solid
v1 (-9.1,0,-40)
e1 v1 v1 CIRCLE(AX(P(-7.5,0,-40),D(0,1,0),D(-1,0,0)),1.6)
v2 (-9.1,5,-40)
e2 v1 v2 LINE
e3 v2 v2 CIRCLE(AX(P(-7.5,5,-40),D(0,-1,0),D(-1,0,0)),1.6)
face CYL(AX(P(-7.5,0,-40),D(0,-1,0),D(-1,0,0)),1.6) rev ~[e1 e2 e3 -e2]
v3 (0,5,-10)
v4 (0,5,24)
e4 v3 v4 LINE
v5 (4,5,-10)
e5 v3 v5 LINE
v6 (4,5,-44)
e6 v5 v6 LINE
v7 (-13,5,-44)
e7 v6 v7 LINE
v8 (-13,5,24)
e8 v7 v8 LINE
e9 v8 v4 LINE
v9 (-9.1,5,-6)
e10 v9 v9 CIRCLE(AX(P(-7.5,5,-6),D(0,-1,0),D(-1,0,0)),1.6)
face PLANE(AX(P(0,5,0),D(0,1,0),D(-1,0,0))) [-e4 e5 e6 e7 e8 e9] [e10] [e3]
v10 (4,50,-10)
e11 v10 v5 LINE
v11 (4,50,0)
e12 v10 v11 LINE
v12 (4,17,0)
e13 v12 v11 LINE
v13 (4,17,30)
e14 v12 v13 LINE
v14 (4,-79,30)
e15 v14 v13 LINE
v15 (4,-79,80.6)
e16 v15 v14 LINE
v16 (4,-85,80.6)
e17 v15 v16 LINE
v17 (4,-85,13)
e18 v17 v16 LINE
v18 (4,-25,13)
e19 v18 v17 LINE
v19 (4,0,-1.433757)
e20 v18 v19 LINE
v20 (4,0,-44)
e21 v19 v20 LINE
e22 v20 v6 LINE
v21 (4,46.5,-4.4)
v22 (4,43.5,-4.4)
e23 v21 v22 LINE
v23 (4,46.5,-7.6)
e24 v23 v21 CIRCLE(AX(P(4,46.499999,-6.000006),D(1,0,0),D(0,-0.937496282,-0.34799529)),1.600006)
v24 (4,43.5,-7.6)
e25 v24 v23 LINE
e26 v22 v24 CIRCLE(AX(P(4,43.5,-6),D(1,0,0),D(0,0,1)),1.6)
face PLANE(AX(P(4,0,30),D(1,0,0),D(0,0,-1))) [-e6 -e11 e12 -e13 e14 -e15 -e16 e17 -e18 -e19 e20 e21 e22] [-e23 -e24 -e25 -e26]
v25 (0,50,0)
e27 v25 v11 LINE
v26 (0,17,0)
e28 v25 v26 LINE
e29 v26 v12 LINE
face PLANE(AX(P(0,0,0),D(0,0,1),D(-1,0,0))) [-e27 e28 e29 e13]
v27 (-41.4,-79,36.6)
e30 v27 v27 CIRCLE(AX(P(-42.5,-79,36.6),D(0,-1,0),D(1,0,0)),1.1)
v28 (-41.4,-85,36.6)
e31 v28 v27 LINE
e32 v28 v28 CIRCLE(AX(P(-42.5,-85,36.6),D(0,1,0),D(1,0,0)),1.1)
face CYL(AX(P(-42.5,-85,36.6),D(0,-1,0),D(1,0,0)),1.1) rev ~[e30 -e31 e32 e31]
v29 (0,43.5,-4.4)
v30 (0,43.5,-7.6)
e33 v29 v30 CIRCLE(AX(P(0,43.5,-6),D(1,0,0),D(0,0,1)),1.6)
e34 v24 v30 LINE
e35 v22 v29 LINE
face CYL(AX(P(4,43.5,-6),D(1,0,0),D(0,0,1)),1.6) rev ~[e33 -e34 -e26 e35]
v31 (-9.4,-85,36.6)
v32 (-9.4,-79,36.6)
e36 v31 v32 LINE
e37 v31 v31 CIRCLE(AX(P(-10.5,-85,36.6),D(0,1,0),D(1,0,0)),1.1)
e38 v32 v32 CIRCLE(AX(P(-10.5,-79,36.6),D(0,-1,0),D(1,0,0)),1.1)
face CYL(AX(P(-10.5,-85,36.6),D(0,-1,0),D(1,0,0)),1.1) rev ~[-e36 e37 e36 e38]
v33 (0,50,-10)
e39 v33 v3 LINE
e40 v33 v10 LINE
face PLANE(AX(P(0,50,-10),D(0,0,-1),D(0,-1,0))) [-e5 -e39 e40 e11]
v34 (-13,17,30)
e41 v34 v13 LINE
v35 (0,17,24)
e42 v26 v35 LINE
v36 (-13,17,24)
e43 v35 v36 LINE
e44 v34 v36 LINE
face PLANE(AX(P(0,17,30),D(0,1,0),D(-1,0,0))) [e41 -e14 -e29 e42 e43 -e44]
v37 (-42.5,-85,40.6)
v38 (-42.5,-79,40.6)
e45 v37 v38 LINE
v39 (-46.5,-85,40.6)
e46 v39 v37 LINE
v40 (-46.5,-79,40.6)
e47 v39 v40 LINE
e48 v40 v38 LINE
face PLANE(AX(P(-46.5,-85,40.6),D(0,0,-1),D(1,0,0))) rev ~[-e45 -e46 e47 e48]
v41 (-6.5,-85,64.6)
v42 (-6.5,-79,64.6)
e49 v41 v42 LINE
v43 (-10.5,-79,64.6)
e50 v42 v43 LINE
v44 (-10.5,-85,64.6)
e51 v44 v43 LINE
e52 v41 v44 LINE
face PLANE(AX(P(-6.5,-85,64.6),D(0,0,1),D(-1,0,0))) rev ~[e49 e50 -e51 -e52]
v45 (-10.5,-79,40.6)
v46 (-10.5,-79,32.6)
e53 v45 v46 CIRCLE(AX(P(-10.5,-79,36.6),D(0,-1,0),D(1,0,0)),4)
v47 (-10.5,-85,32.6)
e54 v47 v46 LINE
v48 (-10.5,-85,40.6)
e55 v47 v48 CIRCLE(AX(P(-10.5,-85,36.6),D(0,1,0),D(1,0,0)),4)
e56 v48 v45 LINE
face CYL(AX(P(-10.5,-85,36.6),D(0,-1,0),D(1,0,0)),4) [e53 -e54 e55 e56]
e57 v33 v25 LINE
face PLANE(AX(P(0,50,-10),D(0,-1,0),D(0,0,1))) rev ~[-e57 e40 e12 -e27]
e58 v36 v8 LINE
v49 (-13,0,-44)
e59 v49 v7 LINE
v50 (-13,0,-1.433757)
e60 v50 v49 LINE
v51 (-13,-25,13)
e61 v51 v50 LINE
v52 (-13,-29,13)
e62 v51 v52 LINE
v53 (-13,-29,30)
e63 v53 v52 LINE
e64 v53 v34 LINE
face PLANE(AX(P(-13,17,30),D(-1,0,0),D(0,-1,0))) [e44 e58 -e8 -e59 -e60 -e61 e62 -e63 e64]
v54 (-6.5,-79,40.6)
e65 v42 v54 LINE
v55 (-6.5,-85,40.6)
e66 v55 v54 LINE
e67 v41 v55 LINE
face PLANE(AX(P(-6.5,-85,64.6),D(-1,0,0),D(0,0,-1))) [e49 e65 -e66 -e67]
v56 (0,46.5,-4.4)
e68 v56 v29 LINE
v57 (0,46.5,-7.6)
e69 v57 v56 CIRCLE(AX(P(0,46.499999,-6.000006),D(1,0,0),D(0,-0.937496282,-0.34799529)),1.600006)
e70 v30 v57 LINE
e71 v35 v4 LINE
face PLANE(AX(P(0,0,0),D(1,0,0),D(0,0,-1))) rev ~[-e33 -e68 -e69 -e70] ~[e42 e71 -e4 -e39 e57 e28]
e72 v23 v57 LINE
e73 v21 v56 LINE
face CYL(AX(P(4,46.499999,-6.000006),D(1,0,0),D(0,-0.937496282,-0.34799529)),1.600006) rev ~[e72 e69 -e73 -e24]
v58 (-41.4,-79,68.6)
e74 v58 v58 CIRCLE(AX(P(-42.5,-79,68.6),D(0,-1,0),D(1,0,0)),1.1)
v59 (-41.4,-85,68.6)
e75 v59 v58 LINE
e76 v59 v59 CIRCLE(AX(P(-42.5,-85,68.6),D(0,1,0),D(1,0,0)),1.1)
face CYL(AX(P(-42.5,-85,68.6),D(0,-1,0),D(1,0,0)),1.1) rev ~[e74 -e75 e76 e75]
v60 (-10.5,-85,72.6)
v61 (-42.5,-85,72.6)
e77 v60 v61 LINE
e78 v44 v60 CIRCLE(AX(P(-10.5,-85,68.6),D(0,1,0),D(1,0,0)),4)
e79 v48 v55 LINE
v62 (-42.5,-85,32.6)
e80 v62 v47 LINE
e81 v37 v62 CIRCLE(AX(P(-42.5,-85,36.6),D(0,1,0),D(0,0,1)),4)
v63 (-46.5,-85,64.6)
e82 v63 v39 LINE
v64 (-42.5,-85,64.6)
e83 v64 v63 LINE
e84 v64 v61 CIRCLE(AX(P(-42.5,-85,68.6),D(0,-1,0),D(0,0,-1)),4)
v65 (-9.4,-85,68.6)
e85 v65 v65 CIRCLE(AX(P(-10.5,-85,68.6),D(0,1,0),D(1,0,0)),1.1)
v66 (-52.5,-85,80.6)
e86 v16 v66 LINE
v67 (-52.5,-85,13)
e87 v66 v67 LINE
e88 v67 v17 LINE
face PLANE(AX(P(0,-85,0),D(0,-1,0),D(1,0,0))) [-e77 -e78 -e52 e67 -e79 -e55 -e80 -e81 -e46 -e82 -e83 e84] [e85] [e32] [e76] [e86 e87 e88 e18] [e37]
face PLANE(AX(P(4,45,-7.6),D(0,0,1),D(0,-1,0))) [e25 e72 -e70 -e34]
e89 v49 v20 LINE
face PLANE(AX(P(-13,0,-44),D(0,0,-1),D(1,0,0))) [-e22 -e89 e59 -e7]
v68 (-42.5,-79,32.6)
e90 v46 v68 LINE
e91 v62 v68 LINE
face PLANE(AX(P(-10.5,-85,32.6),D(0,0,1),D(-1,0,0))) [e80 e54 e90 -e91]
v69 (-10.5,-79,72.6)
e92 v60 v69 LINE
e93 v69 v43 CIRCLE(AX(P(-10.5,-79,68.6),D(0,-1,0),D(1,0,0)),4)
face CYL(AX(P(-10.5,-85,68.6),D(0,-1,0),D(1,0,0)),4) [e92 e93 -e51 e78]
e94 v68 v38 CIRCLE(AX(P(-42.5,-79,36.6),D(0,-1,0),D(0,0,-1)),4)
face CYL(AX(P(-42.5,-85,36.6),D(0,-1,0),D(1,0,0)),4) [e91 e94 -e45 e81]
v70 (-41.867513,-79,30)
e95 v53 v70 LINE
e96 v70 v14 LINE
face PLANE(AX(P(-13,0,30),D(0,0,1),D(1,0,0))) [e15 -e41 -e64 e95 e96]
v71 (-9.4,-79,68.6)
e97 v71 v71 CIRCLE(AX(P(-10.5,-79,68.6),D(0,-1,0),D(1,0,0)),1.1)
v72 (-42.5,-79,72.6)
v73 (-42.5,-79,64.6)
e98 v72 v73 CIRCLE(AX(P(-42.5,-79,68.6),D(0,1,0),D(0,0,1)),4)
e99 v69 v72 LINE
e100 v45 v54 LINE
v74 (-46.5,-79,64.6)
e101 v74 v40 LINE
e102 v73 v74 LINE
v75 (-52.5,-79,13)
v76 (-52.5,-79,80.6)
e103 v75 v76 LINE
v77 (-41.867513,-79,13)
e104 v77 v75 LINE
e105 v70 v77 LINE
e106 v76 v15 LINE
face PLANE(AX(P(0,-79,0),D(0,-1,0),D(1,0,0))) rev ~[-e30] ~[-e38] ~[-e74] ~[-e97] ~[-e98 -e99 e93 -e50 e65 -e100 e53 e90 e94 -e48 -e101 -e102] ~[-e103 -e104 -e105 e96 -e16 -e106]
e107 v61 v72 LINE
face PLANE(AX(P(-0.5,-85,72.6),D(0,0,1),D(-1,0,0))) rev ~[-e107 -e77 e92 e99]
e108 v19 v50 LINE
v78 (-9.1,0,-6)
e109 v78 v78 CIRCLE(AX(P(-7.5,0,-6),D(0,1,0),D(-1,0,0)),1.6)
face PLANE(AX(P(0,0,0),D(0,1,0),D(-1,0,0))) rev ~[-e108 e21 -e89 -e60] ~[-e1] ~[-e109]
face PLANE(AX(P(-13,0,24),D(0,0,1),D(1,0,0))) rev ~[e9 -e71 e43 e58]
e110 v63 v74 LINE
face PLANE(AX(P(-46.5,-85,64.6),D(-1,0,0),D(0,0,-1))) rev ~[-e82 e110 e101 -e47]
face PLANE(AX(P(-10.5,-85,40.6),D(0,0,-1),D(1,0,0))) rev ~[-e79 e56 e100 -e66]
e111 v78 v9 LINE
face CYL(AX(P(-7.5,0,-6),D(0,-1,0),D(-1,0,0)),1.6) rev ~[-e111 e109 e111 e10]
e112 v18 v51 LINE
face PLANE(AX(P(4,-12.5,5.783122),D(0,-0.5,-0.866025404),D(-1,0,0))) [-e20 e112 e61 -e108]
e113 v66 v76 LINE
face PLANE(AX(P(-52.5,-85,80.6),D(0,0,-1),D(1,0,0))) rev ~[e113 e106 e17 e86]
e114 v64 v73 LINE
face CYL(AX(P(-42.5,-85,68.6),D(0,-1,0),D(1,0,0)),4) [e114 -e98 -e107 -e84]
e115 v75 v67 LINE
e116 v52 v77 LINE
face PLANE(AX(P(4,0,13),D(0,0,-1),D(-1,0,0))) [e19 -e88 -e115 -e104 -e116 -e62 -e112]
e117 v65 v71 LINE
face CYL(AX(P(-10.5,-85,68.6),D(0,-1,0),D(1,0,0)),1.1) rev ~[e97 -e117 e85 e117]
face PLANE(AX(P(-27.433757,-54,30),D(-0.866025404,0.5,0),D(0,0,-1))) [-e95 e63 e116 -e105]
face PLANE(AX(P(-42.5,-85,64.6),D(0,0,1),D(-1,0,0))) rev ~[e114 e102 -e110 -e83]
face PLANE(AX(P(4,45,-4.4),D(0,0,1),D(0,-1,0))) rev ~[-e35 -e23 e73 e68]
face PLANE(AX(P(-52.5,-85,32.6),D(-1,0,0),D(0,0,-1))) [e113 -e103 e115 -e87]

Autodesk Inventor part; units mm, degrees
ref_plane "YZ Plane" through (0, 0, 0) normal (1, 0, 0) x (0, 1, 0)
ref_plane "XZ Plane" through (0, 0, 0) normal (0, 1, 0) x (-1, 0, 0)
ref_plane "XY Plane" through (0, 0, 0) normal (0, 0, 1) x (1, 0, 0)
sketch "Sketch1" plane through (0, 0, 0) normal (0, 1, 0) x (-1, 0, 0)
  line L0 (0, 0) -> (13, 0)
  line L1 (13, 0) -> (13, -44)
  line L2 (13, -44) -> (0, -44)
  line L3 (0, -44) -> (0, 0)
  line L4 (13, 0) -> (13, -6)
  line L5 (13, -6) -> (7.5, -6)
  line L6 (7.5, -6) -> (7.5, -40)
  circle A0 centre (7.5, -6) radius 1.6
  circle A1 centre (7.5, -40) radius 1.6
  dimension "d0" = 13
  dimension "d1" = 44
  dimension "d2" = 6
  dimension "d3" = 5.5
  dimension "d4" = 34
  dimension "d5" = 3.2
  dimension "d6" = 3.2
extrude "Extrusion1" add sketch "Sketch1" along normal blind 5
sketch "Sketch2" plane through (0, 0, 0) normal (1, 0, 0) x (0, 0, -1)
  line L0 (0, 5) -> (44, 5) projected
  line L1 (0, 5) -> (44, 5)
  line L2 (44, 5) -> (44, 50)
  line L3 (44, 50) -> (0, 50)
  line L4 (0, 50) -> (0, 5)
  line L5 (0, 0) -> (44, 0)
  line L6 (44, 0) -> (44, 5)
  line L7 (44, 5) -> (0, 5)
  line L8 (0, 5) -> (0, 0)
  line L9 (0, 50) -> (10, 50)
  line L10 (10, 50) -> (10, 5)
  line L11 (10, 5) -> (0, 5)
  line L12 (0, 5) -> (0, 50)
  dimension "d9" = 44
  dimension "d10" = 45
  dimension "d11" = 10
extrude "Extrusion2" add sketch "Sketch2" along normal blind 4 contours L4 L3 L10 L0 | L0 L6 L5 L8
sketch "Sketch3" plane through (4, 0, 0) normal (1, 0, 0) x (0, 0, -1)
  line L0 (44, 5) -> (10, 5) projected
  line L1 (10, 5) -> (10, 45)
  line L2 (10, 5) -> (10, 50) projected
  line L3 (0, 50) -> (0, 5) projected
  line L4 (0, 45) -> (4.4, 45)
  line L5 (6, 45) -> (6, 46.5)
  line L6 (6, 45) -> (6, 43.5)
  line L7 (4.4, 46.5) -> (4.4, 43.5)
  line L8 (7.6, 46.5) -> (7.6, 43.5)
  arc A0 (5.4432, 45) -> (6, 44.9) centre (6, 46.5) ccw
  arc A1 (6.5568, 45) -> (4.4, 46.5) centre (6, 46.5) ccw
  line L9 (10, 45) -> (6.5568, 45)
  line L10 (5.4432, 45) -> (0, 45)
  arc A2 (6, 45.1) -> (5.4432, 45) centre (6, 43.5) ccw
  arc A3 (4.4, 43.5) -> (7.6, 43.5) centre (6, 43.5) ccw
  point P0 (0, 0)
  dimension "d14" = 40
  dimension "d15" = 6
  dimension "d16" = 1.5
  dimension "d17" = 1.5
extrude "Extrusion3" cut sketch "Sketch3" against normal blind 4 contours L6 A0 A2 L5 | A1 L9 L8 A3 L7 | L8 L9 A1
sketch "Sketch4" plane through (-13, 0, 0) normal (0, 0, 1) x (1, 0, 0)
  line L0 (0, 0) -> (17, 0) projected
  line L1 (17, 0) -> (17, 5) projected
  line L2 (0, 0) -> (17, 0)
  line L3 (17, 0) -> (17, 5)
  line L4 (17, 5) -> (0, 5)
  line L5 (0, 5) -> (0, 0)
  line L6 (13, 50) -> (13, 5) projected
  line L7 (17, 0) -> (13, 0)
  line L8 (13, 0) -> (13, 17)
  line L9 (13, 17) -> (17, 17)
  line L10 (17, 17) -> (17, 0)
  dimension "d22" = 17
extrude "Extrusion4" add sketch "Sketch4" along normal blind 30
sketch "Sketch5" plane through (0, 0, 0) normal (0, -1, 0) x (1, 0, 0)
  line L0 (-13, -44) -> (-13, 30) projected
  line L1 (-13, 30) -> (4, 30)
  line L2 (4, 30) -> (4, 13)
  line L3 (4, 13) -> (-13, 13)
  line L4 (-13, 13) -> (-13, 30)
  point P0 (0, 0)
  dimension "d25" = 17
  dimension "d26" = 17
extrude "Extrusion5" add sketch "Sketch5" along normal blind 85
sketch "Sketch7" plane through (0, -85, 0) normal (0, -1, 0) x (1, 0, 0)
  line L0 (4, 13) -> (-13, 13) projected
  line L1 (0, 30) -> (0, -10) projected
  line L2 (0, 13) -> (0, 30)
  line L3 (0, 30) -> (0, 52.6)
  circle A0 centre (-36, 52.6) radius 9
  line L4 (-36, 52.6) -> (-36, 36.6)
  line L5 (-36, 36.6) -> (-20, 36.6)
  line L6 (-36, 52.6) -> (-36, 68.6)
  line L7 (-36, 68.6) -> (-52, 68.6)
  line L8 (-52, 68.6) -> (-20, 68.6)
  line L9 (-20, 68.6) -> (-20, 36.6)
  line L10 (-20, 36.6) -> (-52, 36.6)
  line L11 (-52, 36.6) -> (-52, 68.6)
  circle A1 centre (-20, 68.6) radius 1.1
  circle A2 centre (-20, 36.6) radius 1.1
  circle A3 centre (-52, 36.6) radius 1.1
  circle A4 centre (-52, 68.6) radius 1.1
  circle A5 centre (-20, 68.6) radius 4
  circle A6 centre (-20, 36.6) radius 4
  line L12 (-52, 65.6) -> (-52, 70.6)
  line L13 (-52, 36.6) -> (-52, 42.6)
  circle A7 centre (-52, 68.6) radius 4
  circle A8 centre (-52, 36.6) radius 4
  point P0 (0, 0)
  point P1 (-20, 64.6)
  point P2 (-20, 40.6)
  dimension "d29" = 22.6
  dimension "d31" = 18
  dimension "d32" = 16
  dimension "d33" = 16
  dimension "d34" = 16
  dimension "d35" = 16
  dimension "d36" = 2.2
  dimension "d37" = 2.2
  dimension "d39" = 2.2
  dimension "d40" = 8
  dimension "d43" = 8
  dimension "d49" = 8
  dimension "d50" = 8
sketch "Sketch14" plane through (0, -85, 0) normal (0, -1, 0) x (1, 0, 0)
  line L0 (4, 13) -> (4, 30) projected
  line L1 (4, 13) -> (4, 52.6)
  line L2 (4, 52.6) -> (-26.5, 52.6)
  line L3 (-26.5, 52.6) -> (-26.5, 36.6)
  line L4 (-26.5, 36.6) -> (-10.5, 36.6)
  line L5 (-26.5, 52.6) -> (-42.5, 52.6)
  line L6 (-42.5, 52.6) -> (-42.5, 68.6)
  line L7 (-42.5, 68.6) -> (-10.5, 68.6)
  line L8 (-10.5, 68.6) -> (-10.5, 36.6)
  line L9 (-10.5, 36.6) -> (-42.5, 36.6)
  line L10 (-42.5, 36.6) -> (-42.5, 68.6)
  circle A0 centre (-42.5, 68.6) radius 1.1
  circle A1 centre (-10.5, 68.6) radius 1.1
  circle A2 centre (-10.5, 36.6) radius 1.1
  circle A3 centre (-42.5, 36.6) radius 1.1
  circle A4 centre (-42.5, 68.6) radius 4
  circle A5 centre (-10.5, 68.6) radius 4
  circle A6 centre (-10.5, 36.6) radius 4
  circle A7 centre (-42.5, 36.6) radius 4
  point P0 (0, 0)
  dimension "d91" = 39.6
  dimension "d92" = 30.5
  dimension "d93" = 16
  dimension "d94" = 16
  dimension "d95" = 16
  dimension "d96" = 16
  dimension "d97" = 2.2
  dimension "d98" = 2.2
  dimension "d99" = 2.2
  dimension "d100" = 2.2
  dimension "d101" = 8
  dimension "d102" = 8
  dimension "d103" = 8
  dimension "d104" = 8
extrude "Extrusion14" add sketch "Sketch14" against normal blind 6 contours A5 L7 A1 L8 | L8 A1 L7 A5 | A6 L4 A2 L8 | L8 A2 L4 A6 | A7 L10 A3 L9 | L9 A3 L10 A7 | A4 L7 A0 L6 | L6 A0 L7 A4
sketch "Sketch15" plane through (-10.5, -85, 68.6) normal (0, -1, 0) x (1, 0, 0)
  circle A0 centre (0, 0) radius 4 projected
  line L0 (0, 4) -> (10, 4)
  line L1 (10, 4) -> (10, -4)
  line L2 (10, -4) -> (0, -4)
  line L3 (0, -4) -> (0, 4)
  circle A1 centre (0, -32) radius 4 projected
  line L4 (0, -28) -> (10, -28)
  line L5 (10, -28) -> (10, -36)
  line L6 (10, -36) -> (0, -36)
  line L7 (0, -36) -> (0, -28)
  circle A2 centre (-32, -32) radius 4 projected
  line L8 (-32, -36) -> (-42, -36)
  line L9 (-42, -36) -> (-42, -28)
  line L10 (-42, -28) -> (-32, -28)
  line L11 (-32, -28) -> (-32, -36)
  circle A3 centre (-32, 0) radius 4 projected
  line L12 (-32, -4) -> (-42, -4)
  line L13 (-42, -4) -> (-42, 4)
  line L14 (-42, 4) -> (-32, 4)
  line L15 (-32, 4) -> (-32, -4)
  line L16 (-42, 4) -> (-36, 4)
  line L17 (-36, 4) -> (-36, -36)
  line L18 (-36, -36) -> (-42, -36)
  line L19 (-42, -36) -> (-42, 4)
  line L20 (10, 4) -> (4, 4)
  line L21 (4, 4) -> (4, -36)
  line L22 (4, -36) -> (10, -36)
  line L23 (10, -36) -> (10, 4)
  point P0 (10.5, -68.6)
  point P1 (-36, -4)
  point P2 (-32, 4)
  point P3 (-42, -4)
  point P4 (-36, -28)
  point P5 (0, -4)
  point P6 (4, -4)
  point P7 (4, -28)
  point P8 (10, -4)
  dimension "d107" = 10
  dimension "d108" = 8
  dimension "d109" = 10
  dimension "d110" = 8
  dimension "d111" = 10
  dimension "d112" = 8
  dimension "d113" = 10
  dimension "d114" = 8
  dimension "d115" = 6
  dimension "d116" = 6
extrude "Extrusion15" add sketch "Sketch15" against normal blind 6 contours L21 L2 A0 | A0 L0 L21 | L21 L0 L1 L2 | L2 L23 L4 L21 | L21 A1 L4 | L4 L5 L6 L21 | L21 L6 A1 | A2 L17 L10 | L8 L17 A2 | L17 L8 L9 L10 | L10 L19 L12 L17 | L17 A3 L12 | L12 L13 L14 L17 | L17 L14 A3
sketch "Sketch16" plane through (0, -85, 0) normal (0, -1, 0) x (1, 0, 0)
  line L0 (-0.5, 72.6) -> (-0.5, 32.6) projected
  line L1 (-0.5, 72.6) -> (-52.5, 72.6)
  line L2 (-52.5, 72.6) -> (-52.5, 80.6)
  line L3 (-52.5, 80.6) -> (-0.5, 80.6)
  line L4 (-0.5, 80.6) -> (-0.5, 72.6)
  line L5 (-0.5, 32.6) -> (-10.5, 32.6) projected
  line L6 (-0.5, 32.6) -> (-52.5, 32.6)
  line L7 (-52.5, 32.6) -> (-52.5, 24.6)
  line L8 (-52.5, 24.6) -> (-0.5, 24.6)
  line L9 (-0.5, 24.6) -> (-0.5, 32.6)
  point P0 (0, 0)
  dimension "d119" = 8
  dimension "d120" = 8
extrude "Extrusion16" add sketch "Sketch16" against normal blind 6
sketch "Sketch17" plane through (0, -79, 0) normal (0, 1, 0) x (1, 0, 0)
  line L0 (-0.5, -80.6) -> (-0.5, -30) projected
  line L1 (4, -30) -> (0, -30) projected
  line L2 (-0.5, -80.6) -> (4, -80.6)
  line L3 (4, -80.6) -> (4, -30)
  line L4 (4, -30) -> (-0.5, -30)
  line L5 (-0.5, -30) -> (-0.5, -80.6)
  line L6 (-52.5, -24.6) -> (-52.5, -80.6) projected
  line L7 (-52.5, -24.6) -> (-13, -24.6)
  line L8 (-13, -24.6) -> (-13, -13)
  line L9 (-13, -13) -> (-52.5, -13)
  line L10 (-52.5, -13) -> (-52.5, -24.6)
  point P0 (0, 0)
extrude "Extrusion17" add sketch "Sketch17" against normal blind 6
chamfer "Chamfer4" distance 50 angle 30 1 edges at (-13, -79, 21.5) measured on face at (-13, -24.6667, 24.3333)
chamfer "Chamfer5" distance 25 angle 30 1 edges at (-4.5, 0, 13) measured on face at (-16.9558, -64.3333, 13)
sketch "Sketch19" plane through (-13, 0, 30) normal (0, 0, 1) x (1, 0, 0)
  line L0 (13, 17) -> (13, 5) projected
  line L1 (0, 0) -> (0, 5) projected
  line L2 (13, 17) -> (0, 17)
  line L3 (0, 17) -> (0, 5)
  line L4 (0, 5) -> (13, 5)
  line L5 (13, 5) -> (13, 17)
  point P0 (13, 0)
extrude "Extrusion18" add sketch "Sketch19" against normal blind 6
properties part number "camera_mount_v1"
